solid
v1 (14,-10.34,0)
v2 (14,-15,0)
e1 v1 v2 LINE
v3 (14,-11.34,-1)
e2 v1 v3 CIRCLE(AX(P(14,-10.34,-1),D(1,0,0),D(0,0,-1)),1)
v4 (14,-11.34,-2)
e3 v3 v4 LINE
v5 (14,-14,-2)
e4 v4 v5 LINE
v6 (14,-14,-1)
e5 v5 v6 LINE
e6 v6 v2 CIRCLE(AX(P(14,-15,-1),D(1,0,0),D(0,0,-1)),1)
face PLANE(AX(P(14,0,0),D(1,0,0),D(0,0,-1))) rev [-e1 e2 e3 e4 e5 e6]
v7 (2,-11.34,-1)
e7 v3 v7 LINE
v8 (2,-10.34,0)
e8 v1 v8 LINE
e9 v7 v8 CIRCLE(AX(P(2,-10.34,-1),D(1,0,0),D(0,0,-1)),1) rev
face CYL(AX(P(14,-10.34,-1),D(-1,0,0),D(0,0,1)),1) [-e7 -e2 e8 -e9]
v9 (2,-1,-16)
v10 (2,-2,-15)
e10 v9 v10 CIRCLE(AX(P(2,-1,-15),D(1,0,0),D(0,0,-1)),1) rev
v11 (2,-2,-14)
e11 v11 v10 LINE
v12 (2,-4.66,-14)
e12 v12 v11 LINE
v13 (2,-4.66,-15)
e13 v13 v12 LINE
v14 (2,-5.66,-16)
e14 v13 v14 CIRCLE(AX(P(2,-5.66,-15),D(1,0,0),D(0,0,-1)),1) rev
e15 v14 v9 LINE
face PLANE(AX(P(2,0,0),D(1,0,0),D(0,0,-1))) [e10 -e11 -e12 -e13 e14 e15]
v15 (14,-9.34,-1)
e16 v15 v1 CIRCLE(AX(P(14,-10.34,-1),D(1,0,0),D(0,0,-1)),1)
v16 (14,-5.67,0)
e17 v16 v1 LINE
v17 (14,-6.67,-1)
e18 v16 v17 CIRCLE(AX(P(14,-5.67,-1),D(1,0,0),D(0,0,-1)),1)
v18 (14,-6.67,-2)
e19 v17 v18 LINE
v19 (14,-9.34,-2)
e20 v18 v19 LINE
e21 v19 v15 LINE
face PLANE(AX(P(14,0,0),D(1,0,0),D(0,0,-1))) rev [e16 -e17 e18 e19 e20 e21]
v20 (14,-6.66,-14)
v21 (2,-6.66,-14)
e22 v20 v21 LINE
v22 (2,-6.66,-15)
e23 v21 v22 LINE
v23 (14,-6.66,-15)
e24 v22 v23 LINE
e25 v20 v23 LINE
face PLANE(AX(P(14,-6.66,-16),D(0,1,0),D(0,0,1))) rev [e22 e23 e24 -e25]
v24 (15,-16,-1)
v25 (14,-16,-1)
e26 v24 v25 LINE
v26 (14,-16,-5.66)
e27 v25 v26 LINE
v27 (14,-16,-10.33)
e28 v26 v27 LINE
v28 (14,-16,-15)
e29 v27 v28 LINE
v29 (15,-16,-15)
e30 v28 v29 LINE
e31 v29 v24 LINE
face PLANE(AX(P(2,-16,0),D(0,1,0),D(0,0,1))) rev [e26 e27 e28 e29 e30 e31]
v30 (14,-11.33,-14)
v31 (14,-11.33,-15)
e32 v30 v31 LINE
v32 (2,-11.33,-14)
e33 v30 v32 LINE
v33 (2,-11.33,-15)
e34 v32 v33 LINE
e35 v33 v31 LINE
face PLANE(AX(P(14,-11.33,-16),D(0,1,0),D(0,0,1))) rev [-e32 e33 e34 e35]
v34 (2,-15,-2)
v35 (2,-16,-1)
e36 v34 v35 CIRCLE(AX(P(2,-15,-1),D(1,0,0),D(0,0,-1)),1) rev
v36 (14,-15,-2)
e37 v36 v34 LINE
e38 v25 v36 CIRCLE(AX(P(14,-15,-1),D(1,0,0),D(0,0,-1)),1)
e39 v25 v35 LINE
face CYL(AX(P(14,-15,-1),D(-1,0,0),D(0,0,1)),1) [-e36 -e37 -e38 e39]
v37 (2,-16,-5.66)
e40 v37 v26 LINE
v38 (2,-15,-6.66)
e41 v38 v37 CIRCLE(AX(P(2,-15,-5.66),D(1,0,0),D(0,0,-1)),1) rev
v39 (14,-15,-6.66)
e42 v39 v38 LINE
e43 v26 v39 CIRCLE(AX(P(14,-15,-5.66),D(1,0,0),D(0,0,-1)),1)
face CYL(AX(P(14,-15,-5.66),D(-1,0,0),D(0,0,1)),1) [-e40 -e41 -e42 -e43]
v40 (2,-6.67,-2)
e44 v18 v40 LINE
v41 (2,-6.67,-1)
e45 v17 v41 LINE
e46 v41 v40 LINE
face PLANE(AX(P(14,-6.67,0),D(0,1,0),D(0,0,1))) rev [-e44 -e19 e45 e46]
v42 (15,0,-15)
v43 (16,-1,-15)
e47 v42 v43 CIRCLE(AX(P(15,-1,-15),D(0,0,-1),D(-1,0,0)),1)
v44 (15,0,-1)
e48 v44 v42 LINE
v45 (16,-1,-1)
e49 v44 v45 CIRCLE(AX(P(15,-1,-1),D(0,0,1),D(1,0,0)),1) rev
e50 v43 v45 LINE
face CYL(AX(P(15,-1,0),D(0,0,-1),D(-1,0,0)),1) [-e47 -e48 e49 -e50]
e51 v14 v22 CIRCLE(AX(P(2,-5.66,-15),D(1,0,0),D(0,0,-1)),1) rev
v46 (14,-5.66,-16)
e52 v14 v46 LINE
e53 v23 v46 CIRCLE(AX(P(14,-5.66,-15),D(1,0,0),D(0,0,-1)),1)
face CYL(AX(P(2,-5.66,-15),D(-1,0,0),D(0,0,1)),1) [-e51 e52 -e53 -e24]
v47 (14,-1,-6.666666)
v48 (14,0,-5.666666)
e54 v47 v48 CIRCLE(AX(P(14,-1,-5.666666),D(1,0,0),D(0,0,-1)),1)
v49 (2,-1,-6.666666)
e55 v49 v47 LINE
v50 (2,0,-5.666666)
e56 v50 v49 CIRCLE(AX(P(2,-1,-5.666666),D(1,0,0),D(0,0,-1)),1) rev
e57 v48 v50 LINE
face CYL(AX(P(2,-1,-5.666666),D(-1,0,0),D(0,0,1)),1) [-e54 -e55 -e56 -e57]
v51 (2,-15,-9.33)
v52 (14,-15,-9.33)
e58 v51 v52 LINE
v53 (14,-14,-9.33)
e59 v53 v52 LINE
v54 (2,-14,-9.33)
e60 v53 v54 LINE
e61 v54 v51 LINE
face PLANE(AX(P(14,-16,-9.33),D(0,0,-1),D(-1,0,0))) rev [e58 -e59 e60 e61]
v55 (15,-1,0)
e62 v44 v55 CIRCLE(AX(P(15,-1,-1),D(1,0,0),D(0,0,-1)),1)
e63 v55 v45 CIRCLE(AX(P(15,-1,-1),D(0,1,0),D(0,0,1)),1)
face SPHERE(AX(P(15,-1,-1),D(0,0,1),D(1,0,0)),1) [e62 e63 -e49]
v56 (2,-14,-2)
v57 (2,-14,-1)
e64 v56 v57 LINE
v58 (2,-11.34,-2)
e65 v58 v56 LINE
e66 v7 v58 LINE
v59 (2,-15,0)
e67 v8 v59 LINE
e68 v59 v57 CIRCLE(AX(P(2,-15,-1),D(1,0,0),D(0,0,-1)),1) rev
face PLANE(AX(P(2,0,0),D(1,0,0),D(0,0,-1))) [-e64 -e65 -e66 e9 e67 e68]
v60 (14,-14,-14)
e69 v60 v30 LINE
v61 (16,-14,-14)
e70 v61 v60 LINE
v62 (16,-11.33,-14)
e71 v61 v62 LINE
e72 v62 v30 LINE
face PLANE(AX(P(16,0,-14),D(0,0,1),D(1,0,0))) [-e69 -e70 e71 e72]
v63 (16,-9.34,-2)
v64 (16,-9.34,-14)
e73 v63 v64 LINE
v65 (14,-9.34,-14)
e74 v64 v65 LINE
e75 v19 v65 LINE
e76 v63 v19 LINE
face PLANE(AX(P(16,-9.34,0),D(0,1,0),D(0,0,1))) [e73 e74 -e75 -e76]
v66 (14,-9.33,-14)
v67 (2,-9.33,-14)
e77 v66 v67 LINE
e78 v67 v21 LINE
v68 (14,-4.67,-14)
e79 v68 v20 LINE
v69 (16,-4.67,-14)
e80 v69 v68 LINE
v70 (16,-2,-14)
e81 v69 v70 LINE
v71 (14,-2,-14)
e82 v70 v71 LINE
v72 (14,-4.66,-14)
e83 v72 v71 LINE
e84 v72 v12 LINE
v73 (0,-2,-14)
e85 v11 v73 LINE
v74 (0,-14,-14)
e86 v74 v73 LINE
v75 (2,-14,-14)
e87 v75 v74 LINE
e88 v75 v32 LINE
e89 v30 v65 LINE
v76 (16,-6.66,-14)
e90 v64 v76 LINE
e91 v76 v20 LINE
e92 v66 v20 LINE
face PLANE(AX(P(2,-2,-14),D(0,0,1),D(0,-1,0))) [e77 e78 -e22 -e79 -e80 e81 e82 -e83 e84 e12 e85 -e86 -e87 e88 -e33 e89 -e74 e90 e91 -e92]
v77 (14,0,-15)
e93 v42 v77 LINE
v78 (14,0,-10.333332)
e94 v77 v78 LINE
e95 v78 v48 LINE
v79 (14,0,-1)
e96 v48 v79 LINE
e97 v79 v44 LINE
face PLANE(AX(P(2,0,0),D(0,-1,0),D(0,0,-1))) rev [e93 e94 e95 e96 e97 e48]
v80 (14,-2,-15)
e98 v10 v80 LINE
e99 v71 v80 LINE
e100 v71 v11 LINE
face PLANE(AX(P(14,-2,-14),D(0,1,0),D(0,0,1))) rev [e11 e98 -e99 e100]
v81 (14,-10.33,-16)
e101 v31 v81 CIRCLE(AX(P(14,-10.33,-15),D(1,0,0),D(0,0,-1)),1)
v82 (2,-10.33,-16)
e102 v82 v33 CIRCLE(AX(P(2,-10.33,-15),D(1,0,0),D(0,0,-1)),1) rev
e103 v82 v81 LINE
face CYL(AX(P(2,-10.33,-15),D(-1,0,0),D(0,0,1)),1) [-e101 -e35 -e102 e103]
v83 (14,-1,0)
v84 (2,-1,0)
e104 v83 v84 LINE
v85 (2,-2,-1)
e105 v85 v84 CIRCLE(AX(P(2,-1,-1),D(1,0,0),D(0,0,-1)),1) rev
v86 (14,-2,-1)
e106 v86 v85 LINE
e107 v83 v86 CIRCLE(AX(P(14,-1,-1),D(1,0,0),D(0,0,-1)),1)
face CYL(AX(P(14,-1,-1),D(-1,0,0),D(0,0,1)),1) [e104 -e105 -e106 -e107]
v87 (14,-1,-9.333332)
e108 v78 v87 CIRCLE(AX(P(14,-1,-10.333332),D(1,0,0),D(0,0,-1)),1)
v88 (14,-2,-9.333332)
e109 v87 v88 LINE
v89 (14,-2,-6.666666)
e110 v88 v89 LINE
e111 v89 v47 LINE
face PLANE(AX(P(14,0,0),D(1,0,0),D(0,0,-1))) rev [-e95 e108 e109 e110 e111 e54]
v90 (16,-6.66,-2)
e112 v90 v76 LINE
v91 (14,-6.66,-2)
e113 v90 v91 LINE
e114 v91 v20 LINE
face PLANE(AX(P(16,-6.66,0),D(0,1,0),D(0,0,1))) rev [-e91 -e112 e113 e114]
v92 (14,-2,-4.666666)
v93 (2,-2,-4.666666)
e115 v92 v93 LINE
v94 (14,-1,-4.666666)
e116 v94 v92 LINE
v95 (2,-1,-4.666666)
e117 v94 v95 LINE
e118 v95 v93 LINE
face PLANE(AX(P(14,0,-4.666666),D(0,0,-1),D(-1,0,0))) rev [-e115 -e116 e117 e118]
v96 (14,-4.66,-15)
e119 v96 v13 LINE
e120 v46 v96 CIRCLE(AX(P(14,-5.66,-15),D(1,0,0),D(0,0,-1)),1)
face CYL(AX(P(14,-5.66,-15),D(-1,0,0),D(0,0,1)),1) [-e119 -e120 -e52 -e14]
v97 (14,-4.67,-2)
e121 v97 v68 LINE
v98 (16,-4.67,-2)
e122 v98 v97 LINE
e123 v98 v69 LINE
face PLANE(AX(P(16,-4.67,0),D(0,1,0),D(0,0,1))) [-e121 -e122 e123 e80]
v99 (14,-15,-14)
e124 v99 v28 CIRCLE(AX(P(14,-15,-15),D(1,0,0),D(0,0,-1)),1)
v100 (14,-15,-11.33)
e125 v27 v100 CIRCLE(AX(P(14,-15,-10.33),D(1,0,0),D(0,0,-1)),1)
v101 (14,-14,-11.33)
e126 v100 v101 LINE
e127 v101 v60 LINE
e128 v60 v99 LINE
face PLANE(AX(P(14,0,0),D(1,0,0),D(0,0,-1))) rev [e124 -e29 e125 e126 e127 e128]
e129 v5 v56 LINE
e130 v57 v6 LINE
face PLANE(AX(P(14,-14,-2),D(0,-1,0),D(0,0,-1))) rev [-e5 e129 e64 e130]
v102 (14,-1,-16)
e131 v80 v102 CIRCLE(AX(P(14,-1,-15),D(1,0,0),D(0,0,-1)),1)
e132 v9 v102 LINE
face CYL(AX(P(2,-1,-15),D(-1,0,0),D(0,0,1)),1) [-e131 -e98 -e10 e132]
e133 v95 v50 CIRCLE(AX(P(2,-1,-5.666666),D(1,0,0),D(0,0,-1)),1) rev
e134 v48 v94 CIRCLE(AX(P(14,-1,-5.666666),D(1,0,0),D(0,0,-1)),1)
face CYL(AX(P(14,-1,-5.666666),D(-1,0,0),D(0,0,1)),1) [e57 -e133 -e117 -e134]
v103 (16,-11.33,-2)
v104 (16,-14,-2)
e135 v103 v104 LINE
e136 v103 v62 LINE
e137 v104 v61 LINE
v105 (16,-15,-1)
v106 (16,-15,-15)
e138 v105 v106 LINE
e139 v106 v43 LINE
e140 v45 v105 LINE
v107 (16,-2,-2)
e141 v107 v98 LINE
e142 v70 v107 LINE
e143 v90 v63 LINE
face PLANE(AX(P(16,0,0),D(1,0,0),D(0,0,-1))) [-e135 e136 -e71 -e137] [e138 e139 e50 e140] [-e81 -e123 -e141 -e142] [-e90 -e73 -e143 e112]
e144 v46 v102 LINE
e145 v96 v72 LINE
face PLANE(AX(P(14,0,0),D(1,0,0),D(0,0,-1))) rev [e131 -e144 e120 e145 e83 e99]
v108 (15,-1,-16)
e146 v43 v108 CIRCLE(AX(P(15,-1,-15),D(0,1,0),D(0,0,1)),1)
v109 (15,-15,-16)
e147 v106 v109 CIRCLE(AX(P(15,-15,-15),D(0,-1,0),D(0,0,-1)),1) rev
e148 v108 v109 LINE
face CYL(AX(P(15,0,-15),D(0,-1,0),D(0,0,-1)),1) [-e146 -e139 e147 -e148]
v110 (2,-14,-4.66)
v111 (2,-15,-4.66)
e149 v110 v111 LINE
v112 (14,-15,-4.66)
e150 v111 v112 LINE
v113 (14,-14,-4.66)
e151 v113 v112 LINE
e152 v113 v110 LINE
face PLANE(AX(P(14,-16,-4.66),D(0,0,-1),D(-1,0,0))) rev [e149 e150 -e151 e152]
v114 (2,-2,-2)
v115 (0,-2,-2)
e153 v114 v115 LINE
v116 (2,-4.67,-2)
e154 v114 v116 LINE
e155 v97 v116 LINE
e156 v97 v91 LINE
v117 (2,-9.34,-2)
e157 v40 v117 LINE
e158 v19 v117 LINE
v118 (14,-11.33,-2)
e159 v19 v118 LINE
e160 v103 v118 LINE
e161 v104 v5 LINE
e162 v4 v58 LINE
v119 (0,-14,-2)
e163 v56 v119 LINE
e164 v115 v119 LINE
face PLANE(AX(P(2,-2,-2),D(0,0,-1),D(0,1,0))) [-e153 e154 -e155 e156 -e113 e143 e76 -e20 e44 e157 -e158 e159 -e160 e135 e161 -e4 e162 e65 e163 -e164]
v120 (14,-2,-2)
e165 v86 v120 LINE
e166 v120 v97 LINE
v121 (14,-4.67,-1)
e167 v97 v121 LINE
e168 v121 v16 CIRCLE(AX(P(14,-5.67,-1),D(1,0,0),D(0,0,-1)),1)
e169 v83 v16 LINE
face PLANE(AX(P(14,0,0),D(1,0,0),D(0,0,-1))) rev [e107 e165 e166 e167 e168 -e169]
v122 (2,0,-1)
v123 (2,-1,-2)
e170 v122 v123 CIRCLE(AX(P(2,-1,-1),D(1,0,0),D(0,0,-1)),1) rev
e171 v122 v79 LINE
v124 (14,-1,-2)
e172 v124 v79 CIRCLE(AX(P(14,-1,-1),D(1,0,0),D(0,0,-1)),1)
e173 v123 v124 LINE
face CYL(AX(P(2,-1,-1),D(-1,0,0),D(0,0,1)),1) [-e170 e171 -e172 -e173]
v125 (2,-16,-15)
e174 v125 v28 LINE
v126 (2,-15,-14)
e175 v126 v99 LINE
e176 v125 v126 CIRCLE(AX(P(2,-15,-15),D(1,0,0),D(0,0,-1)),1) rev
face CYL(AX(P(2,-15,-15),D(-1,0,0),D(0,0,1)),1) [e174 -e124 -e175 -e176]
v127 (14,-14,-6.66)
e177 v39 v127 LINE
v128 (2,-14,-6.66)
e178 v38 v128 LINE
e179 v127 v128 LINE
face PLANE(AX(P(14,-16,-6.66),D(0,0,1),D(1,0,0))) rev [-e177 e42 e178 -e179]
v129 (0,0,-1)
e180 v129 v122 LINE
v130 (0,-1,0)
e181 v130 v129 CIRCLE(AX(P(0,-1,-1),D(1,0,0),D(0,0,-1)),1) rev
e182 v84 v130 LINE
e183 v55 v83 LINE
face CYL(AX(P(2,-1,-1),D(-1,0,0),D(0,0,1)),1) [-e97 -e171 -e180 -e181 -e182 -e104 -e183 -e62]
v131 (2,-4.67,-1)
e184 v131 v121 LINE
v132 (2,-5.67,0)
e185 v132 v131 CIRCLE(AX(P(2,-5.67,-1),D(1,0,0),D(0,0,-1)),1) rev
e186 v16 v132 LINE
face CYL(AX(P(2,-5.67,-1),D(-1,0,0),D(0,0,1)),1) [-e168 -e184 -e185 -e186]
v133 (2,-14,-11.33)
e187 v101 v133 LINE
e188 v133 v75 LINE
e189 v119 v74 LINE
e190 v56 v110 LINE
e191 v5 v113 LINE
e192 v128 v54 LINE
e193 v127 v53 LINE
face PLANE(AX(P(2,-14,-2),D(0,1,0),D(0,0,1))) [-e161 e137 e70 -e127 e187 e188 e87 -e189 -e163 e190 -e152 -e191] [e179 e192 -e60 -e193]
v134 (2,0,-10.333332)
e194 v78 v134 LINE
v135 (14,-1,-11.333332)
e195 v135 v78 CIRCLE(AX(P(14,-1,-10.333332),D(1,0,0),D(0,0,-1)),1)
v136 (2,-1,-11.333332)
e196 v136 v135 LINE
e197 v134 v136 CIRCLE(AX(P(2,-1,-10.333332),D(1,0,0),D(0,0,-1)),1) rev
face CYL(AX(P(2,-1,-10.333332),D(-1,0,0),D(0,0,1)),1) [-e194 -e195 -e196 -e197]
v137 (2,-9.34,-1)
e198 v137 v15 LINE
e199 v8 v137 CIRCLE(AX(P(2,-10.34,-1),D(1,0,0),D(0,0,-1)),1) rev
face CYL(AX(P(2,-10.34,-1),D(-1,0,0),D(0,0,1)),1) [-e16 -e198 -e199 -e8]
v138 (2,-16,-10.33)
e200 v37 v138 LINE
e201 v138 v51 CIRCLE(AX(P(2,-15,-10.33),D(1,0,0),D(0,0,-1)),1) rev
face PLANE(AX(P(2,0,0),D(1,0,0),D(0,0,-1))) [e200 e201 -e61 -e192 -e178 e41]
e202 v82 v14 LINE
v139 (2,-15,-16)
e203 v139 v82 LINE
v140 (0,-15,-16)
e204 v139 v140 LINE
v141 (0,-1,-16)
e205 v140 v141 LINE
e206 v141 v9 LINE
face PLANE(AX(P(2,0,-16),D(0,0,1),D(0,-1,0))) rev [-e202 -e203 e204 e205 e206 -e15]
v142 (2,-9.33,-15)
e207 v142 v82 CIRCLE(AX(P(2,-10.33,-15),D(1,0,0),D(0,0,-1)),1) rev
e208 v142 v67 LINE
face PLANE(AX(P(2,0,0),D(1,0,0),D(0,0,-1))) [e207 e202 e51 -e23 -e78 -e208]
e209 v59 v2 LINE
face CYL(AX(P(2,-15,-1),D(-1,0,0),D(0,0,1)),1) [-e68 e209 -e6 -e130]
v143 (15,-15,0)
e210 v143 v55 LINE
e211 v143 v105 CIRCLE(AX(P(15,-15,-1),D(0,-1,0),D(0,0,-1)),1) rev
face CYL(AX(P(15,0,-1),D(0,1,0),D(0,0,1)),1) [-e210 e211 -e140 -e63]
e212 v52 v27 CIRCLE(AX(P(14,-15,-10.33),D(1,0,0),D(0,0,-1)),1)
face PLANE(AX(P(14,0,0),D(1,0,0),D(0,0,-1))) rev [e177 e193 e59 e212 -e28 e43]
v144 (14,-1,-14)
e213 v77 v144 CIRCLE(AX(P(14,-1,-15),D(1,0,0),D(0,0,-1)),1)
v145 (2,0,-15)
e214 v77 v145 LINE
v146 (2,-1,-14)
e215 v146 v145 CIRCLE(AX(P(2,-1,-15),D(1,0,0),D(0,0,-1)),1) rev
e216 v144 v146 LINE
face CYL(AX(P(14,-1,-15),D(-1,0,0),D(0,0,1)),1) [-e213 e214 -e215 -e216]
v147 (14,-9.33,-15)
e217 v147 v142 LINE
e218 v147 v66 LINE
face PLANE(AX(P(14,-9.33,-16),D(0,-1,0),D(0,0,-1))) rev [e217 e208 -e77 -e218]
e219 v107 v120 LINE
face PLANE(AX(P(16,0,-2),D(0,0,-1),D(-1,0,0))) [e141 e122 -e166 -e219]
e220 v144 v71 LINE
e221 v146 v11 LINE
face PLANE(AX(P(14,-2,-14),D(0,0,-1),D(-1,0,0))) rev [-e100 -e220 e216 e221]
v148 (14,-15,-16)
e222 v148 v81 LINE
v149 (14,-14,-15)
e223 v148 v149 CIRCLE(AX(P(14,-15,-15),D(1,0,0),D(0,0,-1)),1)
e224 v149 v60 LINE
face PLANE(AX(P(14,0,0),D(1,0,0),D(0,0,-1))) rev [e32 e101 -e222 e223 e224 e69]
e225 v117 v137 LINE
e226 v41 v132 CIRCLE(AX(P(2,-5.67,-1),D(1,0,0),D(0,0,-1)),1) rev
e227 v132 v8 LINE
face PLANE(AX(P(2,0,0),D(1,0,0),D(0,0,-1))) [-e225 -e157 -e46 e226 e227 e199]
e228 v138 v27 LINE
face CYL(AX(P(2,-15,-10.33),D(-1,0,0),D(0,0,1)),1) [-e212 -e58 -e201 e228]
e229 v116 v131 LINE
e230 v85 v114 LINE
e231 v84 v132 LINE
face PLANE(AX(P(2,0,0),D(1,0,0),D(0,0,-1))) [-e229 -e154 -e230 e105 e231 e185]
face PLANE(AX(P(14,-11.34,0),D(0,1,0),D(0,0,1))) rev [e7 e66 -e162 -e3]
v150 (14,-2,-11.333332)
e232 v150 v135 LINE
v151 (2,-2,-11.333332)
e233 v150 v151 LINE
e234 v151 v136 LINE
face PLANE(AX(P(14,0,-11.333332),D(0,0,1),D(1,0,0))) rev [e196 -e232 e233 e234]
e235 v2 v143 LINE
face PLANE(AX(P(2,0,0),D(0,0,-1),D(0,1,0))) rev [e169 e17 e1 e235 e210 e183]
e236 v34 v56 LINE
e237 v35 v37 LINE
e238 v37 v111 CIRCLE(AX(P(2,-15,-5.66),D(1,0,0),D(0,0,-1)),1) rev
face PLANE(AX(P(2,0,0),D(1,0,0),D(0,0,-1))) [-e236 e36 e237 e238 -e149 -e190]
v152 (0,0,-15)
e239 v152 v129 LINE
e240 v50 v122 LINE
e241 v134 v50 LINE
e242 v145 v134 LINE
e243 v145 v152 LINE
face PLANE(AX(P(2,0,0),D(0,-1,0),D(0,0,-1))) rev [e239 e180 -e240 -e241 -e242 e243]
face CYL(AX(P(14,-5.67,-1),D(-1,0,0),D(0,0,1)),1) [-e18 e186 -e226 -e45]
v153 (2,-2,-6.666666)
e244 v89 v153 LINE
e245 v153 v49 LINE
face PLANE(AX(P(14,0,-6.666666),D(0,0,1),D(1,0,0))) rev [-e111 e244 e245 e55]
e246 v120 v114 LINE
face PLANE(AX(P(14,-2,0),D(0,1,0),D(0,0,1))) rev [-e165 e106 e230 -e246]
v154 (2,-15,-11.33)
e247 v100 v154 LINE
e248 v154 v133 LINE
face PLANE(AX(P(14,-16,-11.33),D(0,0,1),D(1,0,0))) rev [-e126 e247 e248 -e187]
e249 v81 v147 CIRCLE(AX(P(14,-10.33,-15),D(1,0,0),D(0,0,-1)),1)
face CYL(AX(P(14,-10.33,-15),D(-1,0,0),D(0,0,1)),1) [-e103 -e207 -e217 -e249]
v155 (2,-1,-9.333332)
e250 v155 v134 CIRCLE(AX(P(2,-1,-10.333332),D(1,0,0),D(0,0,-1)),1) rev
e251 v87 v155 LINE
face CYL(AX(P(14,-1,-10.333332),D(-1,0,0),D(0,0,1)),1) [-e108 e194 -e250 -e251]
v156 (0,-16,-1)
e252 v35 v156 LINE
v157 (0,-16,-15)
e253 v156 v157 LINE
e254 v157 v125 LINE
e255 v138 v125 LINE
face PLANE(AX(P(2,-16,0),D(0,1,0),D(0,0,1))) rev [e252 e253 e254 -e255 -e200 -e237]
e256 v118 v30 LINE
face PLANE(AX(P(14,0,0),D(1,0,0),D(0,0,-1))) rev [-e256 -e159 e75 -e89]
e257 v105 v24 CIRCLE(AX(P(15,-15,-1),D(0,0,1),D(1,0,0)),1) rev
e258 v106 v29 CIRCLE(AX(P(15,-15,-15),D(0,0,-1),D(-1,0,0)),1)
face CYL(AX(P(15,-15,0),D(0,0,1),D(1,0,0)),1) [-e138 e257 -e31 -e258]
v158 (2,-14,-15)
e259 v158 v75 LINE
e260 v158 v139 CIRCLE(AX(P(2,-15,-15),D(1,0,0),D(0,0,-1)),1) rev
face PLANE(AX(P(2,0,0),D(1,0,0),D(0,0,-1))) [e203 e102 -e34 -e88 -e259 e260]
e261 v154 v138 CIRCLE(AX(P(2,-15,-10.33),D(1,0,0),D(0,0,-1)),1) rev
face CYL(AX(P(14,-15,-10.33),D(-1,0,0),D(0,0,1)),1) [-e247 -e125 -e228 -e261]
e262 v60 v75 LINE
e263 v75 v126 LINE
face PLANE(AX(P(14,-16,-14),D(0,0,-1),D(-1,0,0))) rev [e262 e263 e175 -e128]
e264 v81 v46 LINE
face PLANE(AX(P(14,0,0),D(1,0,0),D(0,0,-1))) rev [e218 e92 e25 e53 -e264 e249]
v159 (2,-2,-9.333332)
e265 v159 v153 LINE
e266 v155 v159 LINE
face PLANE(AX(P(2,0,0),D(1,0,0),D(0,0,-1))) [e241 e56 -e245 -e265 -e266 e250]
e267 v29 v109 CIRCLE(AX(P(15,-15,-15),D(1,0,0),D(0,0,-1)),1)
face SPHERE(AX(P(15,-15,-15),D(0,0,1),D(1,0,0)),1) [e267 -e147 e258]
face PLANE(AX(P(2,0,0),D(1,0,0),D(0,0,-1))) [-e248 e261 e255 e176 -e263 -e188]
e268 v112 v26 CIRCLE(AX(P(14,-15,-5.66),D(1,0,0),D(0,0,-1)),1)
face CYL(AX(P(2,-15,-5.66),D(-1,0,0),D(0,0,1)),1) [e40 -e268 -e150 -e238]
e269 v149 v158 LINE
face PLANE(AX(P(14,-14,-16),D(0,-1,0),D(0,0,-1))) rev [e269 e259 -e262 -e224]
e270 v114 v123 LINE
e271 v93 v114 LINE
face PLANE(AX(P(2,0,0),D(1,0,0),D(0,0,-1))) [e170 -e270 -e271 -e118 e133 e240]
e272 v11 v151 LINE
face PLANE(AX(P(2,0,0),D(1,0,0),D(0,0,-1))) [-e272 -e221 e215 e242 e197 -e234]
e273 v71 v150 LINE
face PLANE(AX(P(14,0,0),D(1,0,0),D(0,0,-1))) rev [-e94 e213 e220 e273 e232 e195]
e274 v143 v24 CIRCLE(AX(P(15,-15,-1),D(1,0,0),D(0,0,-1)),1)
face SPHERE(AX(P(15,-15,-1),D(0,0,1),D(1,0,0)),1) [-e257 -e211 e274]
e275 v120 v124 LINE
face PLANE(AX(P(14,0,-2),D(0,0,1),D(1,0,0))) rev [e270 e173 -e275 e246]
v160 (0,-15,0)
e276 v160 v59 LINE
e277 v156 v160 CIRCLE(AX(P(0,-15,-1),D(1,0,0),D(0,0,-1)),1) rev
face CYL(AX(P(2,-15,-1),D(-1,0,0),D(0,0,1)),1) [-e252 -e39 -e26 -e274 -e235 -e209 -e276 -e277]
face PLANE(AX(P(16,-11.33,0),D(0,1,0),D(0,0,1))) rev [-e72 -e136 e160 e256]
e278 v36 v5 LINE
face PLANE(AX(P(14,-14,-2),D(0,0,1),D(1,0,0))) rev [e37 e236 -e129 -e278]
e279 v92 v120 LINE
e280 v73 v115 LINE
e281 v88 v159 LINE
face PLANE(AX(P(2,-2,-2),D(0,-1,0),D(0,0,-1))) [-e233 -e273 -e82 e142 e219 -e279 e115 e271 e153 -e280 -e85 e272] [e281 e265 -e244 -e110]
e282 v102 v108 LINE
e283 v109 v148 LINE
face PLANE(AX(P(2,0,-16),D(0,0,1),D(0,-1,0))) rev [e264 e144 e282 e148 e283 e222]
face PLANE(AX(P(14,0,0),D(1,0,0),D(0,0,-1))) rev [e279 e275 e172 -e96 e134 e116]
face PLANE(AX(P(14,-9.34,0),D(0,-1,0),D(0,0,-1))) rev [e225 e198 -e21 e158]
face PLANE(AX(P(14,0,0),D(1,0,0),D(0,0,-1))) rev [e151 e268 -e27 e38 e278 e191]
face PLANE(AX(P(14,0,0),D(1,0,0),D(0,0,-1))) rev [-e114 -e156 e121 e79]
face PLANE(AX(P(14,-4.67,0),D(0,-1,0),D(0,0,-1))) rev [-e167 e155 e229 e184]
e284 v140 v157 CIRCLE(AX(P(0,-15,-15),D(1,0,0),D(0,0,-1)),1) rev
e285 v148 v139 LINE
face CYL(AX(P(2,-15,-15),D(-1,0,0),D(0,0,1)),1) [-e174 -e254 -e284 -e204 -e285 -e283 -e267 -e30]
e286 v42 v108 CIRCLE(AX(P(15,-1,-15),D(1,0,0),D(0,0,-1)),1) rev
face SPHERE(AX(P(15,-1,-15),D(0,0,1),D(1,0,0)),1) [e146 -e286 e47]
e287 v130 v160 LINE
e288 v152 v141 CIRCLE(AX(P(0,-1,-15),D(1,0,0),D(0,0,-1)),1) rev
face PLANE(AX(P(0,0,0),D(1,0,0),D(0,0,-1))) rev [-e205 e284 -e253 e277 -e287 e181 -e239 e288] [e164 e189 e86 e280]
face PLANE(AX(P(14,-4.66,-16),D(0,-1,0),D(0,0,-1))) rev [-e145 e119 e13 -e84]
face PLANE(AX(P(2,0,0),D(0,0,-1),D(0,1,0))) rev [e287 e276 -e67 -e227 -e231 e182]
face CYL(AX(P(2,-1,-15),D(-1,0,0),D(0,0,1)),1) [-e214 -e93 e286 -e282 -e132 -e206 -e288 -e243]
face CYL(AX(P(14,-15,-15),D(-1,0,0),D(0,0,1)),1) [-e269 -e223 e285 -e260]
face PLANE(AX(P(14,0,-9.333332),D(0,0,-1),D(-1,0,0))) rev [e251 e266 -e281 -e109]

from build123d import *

# Parameters (mm, degrees)
SKETCH_1_W      = 16
SKETCH_1_H      = 16
SKETCH_1_W_2    = 12
SKETCH_1_H_2    = 12
EXTRUDE_1_DEPTH = 2
SKETCH_2_W      = 2
SKETCH_2_H      = 2
EXTRUDE_2_DEPTH = 12
SKETCH_3_W      = 2
SKETCH_3_H      = 2
SKETCH_3_W_2    = 12
SKETCH_3_H_2    = 1.99
EXTRUDE_3_DEPTH = 2
FILLET_1_R      = 1
FILLET_2_R      = 1


with BuildPart() as part:
    # 草图1 → 凸台-拉伸1 (new body)
    with BuildSketch(Plane(origin=(0, 0, 0), x_dir=(0, 0, -1), z_dir=(1, 0, 0))):
        with Locations((8, -8)):
            Rectangle(SKETCH_1_W, SKETCH_1_H)
        with Locations((8, -8)):
            Rectangle(SKETCH_1_W_2, SKETCH_1_H_2, mode=Mode.SUBTRACT)
    extrude(amount=EXTRUDE_1_DEPTH)

    # 草图2 → 凸台-拉伸2 (add)
    with BuildSketch(Plane(origin=(2, 0, 0), x_dir=(0, 0, -1), z_dir=(1, 0, 0))):
        with Locations((5.666666, -1)):
            Rectangle(SKETCH_2_W, SKETCH_2_H)
        with Locations((1, -1)):
            Rectangle(SKETCH_2_W, SKETCH_2_H)
        with Locations((10.333332, -1)):
            Rectangle(SKETCH_2_W, SKETCH_2_H)
        with Locations((15, -1)):
            Rectangle(SKETCH_2_W, SKETCH_2_H)
        with Locations((1, -5.67)):
            Rectangle(SKETCH_2_W, SKETCH_2_H)
        with Locations((1, -10.34)):
            Rectangle(SKETCH_2_W, SKETCH_2_H)
        with Locations((1, -15)):
            Rectangle(SKETCH_2_W, SKETCH_2_H)
        with Locations((10.33, -15)):
            Rectangle(SKETCH_2_W, SKETCH_2_H)
        with Locations((15, -15)):
            Rectangle(SKETCH_2_W, SKETCH_2_H)
        with Locations((5.66, -15)):
            Rectangle(SKETCH_2_W, SKETCH_2_H)
        with Locations((15, -10.33)):
            Rectangle(SKETCH_2_W, SKETCH_2_H)
        with Locations((15, -5.66)):
            Rectangle(SKETCH_2_W, SKETCH_2_H)
    extrude(amount=EXTRUDE_2_DEPTH)

    # 草图3 → 凸台-拉伸3 (add)
    with BuildSketch(Plane(origin=(14, 0, 0), x_dir=(0, 0, -1), z_dir=(1, 0, 0))):
        with Locations((1, -1)):
            Rectangle(SKETCH_3_W, SKETCH_3_H)
        Polygon((2, -2), (0, -2), (0, -16), (2, -16), (2, -14), (2, -11.33), (2, -9.34), (2, -6.66), (2, -4.67), align=None)
        Polygon((2, -14), (2, -16), (16, -16), (16, -14), (14, -14), align=None)
        Polygon((16, 0), (14, 0), (14, -2), (14, -4.67), (14, -6.66), (14, -9.34), (14, -11.33), (14, -14), (16, -14), align=None)
        with Locations((8, -1)):
            Rectangle(SKETCH_3_W_2, SKETCH_3_H)
        with Locations((8, -5.665)):
            Rectangle(SKETCH_3_W_2, SKETCH_3_H_2)
        with Locations((8, -10.335)):
            Rectangle(SKETCH_3_W_2, SKETCH_3_H_2)
    extrude(amount=EXTRUDE_3_DEPTH)

    # 圆角1
    fillet_1_edges = [part.edges().sort_by_distance(p)[0] for p in [
        (16, -16, -8),
        (16, -8, -16),
        (16, 0, -8),
        (16, -8, 0),
        (8, 0, 0),
        (8, 0, -16),
        (8, -16, -16),
        (8, -16, 0),
    ]]
    fillet(fillet_1_edges, radius=FILLET_1_R)

    # 圆角2
    fillet_2_edges = [part.edges().sort_by_distance(p)[0] for p in [
        (8, -16, -2),
        (8, -14, 0),
        (8, -16, -9.33),
        (8, -16, -11.33),
        (8, -16, -4.66),
        (8, -16, -6.66),
        (8, -11.33, -16),
        (8, -9.33, -16),
        (8, -6.66, -16),
        (8, -4.66, -16),
        (8, -2, 0),
        (8, 0, -2),
        (8, -14, -16),
        (8, -16, -14),
        (8, 0, -6.666666),
        (8, 0, -4.666666),
        (8, 0, -11.333332),
        (8, 0, -9.333332),
        (8, 0, -14),
        (8, -2, -16),
        (8, -4.67, 0),
        (8, -6.67, 0),
        (8, -9.34, 0),
        (8, -11.34, 0),
    ]]
    fillet(fillet_2_edges, radius=FILLET_2_R - 0.0001)  # a hair under: the kernel refuses the full size


solid = part.part
